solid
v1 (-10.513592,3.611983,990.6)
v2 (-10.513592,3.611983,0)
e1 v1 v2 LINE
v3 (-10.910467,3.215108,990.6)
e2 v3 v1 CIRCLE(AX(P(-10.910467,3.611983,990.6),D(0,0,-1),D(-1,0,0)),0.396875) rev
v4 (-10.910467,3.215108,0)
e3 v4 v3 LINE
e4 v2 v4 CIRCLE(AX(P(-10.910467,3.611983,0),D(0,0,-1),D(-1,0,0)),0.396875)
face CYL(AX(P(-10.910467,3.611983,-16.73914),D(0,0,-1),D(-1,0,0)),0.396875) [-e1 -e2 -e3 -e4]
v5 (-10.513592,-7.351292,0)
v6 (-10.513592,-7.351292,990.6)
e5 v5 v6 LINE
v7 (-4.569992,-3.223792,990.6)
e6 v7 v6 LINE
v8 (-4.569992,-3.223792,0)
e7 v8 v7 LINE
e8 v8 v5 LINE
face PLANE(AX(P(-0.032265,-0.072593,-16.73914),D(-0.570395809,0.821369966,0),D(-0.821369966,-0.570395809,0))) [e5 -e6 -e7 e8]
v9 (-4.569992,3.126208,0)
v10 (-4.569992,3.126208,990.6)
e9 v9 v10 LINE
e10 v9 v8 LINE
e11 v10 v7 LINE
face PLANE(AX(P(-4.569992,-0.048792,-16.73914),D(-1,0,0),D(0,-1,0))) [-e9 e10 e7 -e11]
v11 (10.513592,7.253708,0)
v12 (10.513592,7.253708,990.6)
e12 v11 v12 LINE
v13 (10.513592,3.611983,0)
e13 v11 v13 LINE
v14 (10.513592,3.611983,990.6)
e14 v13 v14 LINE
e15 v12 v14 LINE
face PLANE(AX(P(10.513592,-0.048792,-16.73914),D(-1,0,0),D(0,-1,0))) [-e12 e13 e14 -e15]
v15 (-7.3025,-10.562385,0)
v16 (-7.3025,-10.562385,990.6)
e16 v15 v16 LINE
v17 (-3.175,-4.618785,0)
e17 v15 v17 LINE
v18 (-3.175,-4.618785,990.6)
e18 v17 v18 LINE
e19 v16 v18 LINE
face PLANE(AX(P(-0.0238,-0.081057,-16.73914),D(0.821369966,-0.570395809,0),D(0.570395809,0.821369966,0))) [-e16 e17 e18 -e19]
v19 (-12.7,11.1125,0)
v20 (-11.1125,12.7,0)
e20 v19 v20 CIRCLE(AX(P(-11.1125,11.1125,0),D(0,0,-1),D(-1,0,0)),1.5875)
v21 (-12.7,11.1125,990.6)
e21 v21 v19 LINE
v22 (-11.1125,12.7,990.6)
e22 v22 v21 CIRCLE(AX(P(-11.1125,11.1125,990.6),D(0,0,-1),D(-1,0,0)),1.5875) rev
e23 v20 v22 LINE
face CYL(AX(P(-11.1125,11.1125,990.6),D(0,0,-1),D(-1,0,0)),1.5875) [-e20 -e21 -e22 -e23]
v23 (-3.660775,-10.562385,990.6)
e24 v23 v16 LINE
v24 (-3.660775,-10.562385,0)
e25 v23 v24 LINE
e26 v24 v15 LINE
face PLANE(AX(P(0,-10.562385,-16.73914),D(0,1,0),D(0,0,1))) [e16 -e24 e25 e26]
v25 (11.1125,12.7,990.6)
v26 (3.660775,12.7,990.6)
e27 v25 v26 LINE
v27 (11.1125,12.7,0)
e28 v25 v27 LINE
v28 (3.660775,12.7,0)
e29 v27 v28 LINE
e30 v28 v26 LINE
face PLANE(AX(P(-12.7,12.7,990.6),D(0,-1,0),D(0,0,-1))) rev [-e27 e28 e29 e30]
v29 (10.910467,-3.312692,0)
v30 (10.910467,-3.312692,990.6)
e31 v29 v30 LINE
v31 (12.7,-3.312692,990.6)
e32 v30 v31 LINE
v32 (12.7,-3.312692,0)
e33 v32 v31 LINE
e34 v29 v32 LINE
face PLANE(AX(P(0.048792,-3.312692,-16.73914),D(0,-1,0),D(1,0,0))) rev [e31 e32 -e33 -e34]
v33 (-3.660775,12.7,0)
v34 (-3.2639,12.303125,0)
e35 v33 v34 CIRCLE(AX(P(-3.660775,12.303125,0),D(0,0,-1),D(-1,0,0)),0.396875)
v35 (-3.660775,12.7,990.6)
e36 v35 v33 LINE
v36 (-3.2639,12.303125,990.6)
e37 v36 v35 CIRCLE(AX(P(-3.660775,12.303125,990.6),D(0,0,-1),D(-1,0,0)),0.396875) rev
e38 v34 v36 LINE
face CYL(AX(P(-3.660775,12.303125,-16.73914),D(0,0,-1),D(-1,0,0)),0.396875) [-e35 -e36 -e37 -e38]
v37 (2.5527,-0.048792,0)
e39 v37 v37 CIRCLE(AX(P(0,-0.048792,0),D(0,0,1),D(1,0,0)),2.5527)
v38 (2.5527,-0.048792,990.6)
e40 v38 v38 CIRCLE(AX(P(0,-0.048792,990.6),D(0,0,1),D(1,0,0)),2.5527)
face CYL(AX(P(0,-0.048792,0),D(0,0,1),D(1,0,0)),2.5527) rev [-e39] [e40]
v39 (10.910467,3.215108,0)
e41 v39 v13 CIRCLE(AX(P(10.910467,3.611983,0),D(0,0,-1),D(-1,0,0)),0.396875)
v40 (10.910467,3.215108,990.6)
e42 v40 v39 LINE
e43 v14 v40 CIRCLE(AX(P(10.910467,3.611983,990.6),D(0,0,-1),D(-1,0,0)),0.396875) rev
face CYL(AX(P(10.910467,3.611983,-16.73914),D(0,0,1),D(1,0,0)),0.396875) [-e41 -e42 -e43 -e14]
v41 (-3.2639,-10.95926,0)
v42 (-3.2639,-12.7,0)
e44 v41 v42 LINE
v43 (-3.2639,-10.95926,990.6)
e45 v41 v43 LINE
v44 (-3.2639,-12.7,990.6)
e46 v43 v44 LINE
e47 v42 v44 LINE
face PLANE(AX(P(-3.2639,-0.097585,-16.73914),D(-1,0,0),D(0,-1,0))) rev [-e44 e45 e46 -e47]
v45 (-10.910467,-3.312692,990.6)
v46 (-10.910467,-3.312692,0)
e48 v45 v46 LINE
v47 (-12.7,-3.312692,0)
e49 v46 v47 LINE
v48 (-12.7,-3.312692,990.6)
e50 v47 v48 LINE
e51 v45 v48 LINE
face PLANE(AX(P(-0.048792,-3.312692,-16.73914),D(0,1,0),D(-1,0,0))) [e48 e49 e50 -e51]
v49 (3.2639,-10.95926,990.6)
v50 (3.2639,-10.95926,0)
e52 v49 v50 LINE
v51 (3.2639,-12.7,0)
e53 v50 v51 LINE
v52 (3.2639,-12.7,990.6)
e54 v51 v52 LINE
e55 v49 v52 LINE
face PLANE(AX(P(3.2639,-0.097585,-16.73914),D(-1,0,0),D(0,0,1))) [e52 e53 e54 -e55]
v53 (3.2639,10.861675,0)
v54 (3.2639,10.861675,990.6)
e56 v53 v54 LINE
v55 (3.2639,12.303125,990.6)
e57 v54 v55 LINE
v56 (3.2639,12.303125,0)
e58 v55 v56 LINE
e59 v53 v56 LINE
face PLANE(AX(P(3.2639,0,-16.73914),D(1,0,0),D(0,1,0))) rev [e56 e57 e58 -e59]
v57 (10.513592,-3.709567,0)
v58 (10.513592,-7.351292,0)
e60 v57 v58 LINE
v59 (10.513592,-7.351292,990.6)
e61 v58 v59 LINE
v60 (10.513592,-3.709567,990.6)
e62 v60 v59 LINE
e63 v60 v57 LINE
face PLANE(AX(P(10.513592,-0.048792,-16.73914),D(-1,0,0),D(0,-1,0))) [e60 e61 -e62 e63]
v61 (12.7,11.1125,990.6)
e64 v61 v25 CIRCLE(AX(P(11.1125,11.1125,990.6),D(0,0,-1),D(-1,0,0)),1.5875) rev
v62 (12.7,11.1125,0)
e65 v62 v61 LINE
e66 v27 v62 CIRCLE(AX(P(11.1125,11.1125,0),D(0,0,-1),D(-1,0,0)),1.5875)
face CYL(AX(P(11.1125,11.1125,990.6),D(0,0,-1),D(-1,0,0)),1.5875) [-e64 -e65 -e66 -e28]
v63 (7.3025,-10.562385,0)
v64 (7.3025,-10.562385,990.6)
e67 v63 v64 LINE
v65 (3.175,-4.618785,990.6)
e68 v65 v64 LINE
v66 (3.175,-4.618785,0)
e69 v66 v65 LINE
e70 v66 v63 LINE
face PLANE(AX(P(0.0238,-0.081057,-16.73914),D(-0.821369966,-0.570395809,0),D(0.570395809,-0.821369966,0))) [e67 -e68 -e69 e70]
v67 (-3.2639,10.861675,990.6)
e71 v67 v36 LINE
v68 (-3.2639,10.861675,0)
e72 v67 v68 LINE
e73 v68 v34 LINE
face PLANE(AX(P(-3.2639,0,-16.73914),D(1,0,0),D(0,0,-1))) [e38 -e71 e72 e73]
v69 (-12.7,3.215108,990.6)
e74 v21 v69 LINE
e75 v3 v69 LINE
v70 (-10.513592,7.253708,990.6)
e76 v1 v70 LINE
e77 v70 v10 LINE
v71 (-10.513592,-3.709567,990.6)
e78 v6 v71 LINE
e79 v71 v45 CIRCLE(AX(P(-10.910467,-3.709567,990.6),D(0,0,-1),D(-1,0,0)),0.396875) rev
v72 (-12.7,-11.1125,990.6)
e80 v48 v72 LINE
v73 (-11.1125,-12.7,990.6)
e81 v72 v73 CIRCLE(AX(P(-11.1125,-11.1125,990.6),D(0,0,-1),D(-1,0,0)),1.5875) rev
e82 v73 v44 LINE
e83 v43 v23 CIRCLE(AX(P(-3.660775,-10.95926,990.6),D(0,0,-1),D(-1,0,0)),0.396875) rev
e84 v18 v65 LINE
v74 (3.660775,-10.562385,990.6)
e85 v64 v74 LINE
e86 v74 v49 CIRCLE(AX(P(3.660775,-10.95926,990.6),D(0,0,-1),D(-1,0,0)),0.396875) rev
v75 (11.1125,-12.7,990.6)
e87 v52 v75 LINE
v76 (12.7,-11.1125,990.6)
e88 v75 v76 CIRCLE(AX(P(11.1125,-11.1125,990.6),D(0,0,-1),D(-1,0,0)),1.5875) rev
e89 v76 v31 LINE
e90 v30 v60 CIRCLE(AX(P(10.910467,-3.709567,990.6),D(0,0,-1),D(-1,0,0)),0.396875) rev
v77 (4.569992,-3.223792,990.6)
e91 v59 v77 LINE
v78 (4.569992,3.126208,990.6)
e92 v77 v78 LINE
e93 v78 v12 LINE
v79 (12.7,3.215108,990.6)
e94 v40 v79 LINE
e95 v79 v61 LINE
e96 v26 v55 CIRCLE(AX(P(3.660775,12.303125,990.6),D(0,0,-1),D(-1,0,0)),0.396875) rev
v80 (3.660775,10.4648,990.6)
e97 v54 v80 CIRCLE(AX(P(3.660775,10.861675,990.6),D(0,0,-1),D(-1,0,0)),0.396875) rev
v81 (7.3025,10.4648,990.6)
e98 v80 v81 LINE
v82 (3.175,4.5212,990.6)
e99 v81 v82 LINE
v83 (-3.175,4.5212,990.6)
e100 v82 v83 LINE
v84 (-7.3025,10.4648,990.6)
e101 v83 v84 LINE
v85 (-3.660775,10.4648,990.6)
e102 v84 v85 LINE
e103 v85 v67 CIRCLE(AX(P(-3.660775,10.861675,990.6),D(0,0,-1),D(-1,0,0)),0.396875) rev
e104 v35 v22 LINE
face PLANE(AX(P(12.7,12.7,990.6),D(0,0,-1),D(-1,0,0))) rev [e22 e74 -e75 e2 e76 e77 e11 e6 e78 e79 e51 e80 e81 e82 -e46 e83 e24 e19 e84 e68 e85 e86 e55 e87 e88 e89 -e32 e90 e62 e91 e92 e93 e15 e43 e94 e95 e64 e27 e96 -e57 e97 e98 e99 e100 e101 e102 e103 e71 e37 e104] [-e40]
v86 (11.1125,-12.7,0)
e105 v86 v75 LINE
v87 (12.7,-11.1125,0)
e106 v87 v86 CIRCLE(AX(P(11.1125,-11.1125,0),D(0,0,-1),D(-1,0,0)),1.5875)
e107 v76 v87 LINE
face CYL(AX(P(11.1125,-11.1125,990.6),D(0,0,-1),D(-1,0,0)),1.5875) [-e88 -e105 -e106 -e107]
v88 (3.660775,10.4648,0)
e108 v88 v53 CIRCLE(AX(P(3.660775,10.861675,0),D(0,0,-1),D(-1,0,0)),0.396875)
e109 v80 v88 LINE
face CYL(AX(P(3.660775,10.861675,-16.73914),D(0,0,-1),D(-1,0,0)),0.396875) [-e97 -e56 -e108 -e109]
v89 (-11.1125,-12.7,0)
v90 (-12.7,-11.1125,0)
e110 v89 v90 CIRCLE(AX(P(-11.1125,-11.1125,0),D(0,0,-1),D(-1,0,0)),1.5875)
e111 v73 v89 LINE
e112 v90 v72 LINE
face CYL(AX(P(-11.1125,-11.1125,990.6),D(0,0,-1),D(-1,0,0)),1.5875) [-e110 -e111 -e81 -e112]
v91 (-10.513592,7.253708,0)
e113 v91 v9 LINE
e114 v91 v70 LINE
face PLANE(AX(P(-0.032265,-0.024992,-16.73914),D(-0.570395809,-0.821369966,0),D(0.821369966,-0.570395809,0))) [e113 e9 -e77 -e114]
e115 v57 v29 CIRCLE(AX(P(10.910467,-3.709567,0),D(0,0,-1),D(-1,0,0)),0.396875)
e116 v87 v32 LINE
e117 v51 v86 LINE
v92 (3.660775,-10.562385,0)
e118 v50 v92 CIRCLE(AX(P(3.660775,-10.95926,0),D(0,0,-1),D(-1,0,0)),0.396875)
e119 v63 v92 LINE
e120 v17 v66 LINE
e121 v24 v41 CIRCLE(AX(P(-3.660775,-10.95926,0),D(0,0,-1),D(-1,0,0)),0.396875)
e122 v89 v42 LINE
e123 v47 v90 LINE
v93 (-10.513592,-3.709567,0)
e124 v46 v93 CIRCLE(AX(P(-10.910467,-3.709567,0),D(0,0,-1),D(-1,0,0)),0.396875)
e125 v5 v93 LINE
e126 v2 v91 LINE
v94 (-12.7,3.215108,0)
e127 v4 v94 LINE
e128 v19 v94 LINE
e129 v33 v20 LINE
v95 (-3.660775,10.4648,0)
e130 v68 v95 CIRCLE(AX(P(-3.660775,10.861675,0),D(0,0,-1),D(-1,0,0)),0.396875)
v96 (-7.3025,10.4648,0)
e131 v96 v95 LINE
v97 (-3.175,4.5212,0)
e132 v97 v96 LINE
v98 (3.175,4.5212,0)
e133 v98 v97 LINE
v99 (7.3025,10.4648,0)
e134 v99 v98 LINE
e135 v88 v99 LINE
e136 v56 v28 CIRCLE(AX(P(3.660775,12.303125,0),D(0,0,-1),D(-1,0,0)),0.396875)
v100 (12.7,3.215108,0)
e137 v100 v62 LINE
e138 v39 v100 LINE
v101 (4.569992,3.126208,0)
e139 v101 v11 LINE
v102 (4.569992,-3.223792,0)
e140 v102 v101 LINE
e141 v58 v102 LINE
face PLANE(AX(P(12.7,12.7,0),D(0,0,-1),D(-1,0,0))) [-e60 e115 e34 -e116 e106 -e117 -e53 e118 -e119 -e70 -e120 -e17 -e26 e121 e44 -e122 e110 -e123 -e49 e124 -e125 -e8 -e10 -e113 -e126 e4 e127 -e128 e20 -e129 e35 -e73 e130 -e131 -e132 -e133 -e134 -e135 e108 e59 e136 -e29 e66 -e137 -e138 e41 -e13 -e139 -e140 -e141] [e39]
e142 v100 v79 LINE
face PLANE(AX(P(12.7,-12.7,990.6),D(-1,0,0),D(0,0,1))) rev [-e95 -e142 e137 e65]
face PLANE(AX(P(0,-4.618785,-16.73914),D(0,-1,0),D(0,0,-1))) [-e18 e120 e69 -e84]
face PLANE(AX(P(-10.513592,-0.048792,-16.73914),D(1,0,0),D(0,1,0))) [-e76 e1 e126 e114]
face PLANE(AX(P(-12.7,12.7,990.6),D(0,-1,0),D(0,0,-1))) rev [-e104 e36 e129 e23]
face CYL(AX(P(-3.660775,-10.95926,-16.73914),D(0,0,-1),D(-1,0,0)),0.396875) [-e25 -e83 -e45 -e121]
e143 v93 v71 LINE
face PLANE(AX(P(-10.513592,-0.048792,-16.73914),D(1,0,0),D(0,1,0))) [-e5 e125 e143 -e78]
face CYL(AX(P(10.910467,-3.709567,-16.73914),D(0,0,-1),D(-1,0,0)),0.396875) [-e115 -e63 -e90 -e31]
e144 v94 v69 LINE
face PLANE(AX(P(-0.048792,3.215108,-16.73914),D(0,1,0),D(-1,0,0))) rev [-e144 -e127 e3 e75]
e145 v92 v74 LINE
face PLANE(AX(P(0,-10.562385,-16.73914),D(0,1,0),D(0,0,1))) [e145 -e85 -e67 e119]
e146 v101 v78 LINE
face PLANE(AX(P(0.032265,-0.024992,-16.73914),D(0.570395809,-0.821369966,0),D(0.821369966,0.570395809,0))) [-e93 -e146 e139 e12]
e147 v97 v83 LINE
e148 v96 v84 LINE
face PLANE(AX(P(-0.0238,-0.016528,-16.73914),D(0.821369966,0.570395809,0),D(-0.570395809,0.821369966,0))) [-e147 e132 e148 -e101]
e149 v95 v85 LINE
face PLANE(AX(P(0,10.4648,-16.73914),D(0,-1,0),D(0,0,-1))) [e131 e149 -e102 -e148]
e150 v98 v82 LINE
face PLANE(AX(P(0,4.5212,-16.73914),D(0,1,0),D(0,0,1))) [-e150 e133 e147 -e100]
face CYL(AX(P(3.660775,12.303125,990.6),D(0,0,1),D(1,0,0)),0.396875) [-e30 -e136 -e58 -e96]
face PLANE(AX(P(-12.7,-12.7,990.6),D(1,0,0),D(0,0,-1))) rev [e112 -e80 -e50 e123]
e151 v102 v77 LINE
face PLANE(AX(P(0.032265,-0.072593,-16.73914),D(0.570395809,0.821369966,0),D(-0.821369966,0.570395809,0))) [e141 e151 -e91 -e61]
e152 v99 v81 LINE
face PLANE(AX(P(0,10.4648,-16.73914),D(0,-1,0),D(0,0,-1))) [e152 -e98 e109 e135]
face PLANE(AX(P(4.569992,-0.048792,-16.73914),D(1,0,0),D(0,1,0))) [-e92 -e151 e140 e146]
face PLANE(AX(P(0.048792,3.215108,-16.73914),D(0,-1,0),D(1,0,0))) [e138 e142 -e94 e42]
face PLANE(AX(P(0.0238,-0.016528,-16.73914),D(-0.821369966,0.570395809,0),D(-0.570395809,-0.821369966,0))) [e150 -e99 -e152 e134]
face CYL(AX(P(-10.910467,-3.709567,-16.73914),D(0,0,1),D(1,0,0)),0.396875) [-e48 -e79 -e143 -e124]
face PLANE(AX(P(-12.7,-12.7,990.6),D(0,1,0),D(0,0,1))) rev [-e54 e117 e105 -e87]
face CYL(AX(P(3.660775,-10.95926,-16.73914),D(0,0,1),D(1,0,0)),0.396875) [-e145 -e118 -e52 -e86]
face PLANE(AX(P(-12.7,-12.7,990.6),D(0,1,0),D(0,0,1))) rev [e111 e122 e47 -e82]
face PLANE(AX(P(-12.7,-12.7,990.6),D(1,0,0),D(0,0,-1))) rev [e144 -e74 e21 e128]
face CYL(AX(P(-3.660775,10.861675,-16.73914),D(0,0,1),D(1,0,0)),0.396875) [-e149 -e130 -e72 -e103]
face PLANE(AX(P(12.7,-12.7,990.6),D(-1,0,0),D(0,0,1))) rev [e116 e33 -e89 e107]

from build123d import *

# Parameters (mm, degrees)
SKETCH1_W           = 25.4
SKETCH1_H           = 25.4
BOSS_EXTRUDE1_DEPTH = 990.6
FILLET1_R           = 1.5875
HOLE1_OUTLINE_R     = 2.5527
HOLE1_DEPTH         = 990.6
SKETCH7_W           = 6.5278
SKETCH7_H           = 2.2352
CUT_EXTRUDE2_DEPTH  = 990.6
FILLET4_R           = 0.396875
CIRPATTERN2_DEPTH   = 990.6


# Read off the part's stored shape, not the designer's step: Hole1, CirPattern2
with BuildPart() as part:
    # Sketch1 → Boss-Extrude1 (new body)
    with BuildSketch(Plane.XY):
        Rectangle(SKETCH1_W, SKETCH1_H)
    extrude(amount=BOSS_EXTRUDE1_DEPTH)

    # Fillet1
    fillet1_edges = [part.edges().sort_by_distance(p)[0] for p in [
        (12.7, -12.7, 495.3),
        (-12.7, -12.7, 495.3),
        (-12.7, 12.7, 495.3),
        (12.7, 12.7, 495.3),
    ]]
    fillet(fillet1_edges, radius=FILLET1_R)

    # Hole1 outline → Hole1 (cut)
    with BuildSketch(Plane.XY):
        with Locations((0, -0.048792482)):
            Circle(HOLE1_OUTLINE_R)
    extrude(amount=HOLE1_DEPTH, mode=Mode.SUBTRACT)

    # Sketch7 → Cut-Extrude2 (cut)
    with BuildSketch(Plane.XY.offset(990.6)):
        with Locations((0, 11.5824)):
            Rectangle(SKETCH7_W, SKETCH7_H)
        Polygon((-3.175, 4.5212), (-7.3025, 10.4648), (7.3025, 10.4648), (3.175, 4.5212), align=None)
    extrude(amount=-CUT_EXTRUDE2_DEPTH, mode=Mode.SUBTRACT)

    # Fillet4
    fillet4_edges = [part.edges().sort_by_distance(p)[0] for p in [
        (-3.2639, 10.4648, 495.3),
        (-3.2639, 12.7, 495.3),
        (3.2639, 12.7, 495.3),
        (3.2639, 10.4648, 495.3),
    ]]
    fillet(fillet4_edges, radius=FILLET4_R)

    # CirPattern2 outline → CirPattern2 (cut)
    with BuildSketch(Plane.XY):
        with BuildLine():
            ThreePointArc((-3.660775, -10.562384964), (-3.380141996, -10.67862696), (-3.2639, -10.959259964))
            Line((-3.2639, -10.959259964), (-3.2639, -12.7))
            Line((-3.2639, -12.7), (3.2639, -12.7))
            Line((3.2639, -12.7), (3.2639, -10.959259964))
            ThreePointArc((3.2639, -10.959259964), (3.380141996, -10.67862696), (3.660775, -10.562384964))
            Line((3.660775, -10.562384964), (7.3025, -10.562384964))
            Line((7.3025, -10.562384964), (3.175, -4.618784964))
            Line((3.175, -4.618784964), (-3.175, -4.618784964))
            Line((-3.175, -4.618784964), (-7.3025, -10.562384964))
            Line((-7.3025, -10.562384964), (-3.660775, -10.562384964))
        make_face()
        with BuildLine():
            Line((-12.7, -3.312692482), (-10.910467482, -3.312692482))
            ThreePointArc((-10.910467482, -3.312692482), (-10.629834478, -3.428934478), (-10.513592482, -3.709567482))
            Line((-10.513592482, -3.709567482), (-10.513592482, -7.351292482))
            Line((-10.513592482, -7.351292482), (-4.569992482, -3.223792482))
            Line((-4.569992482, -3.223792482), (-4.569992482, 3.126207518))
            Line((-4.569992482, 3.126207518), (-10.513592482, 7.253707518))
            Line((-10.513592482, 7.253707518), (-10.513592482, 3.611982518))
            ThreePointArc((-10.513592482, 3.611982518), (-10.629834478, 3.331349514), (-10.910467482, 3.215107518))
            Line((-10.910467482, 3.215107518), (-12.7, 3.215107518))
            Line((-12.7, 3.215107518), (-12.7, -3.312692482))
        make_face()
        with BuildLine():
            ThreePointArc((10.513592482, -3.709567482), (10.629834478, -3.428934478), (10.910467482, -3.312692482))
            Line((10.910467482, -3.312692482), (12.7, -3.312692482))
            Line((12.7, -3.312692482), (12.7, 3.215107518))
            Line((12.7, 3.215107518), (10.910467482, 3.215107518))
            ThreePointArc((10.910467482, 3.215107518), (10.629834478, 3.331349514), (10.513592482, 3.611982518))
            Line((10.513592482, 3.611982518), (10.513592482, 7.253707518))
            Line((10.513592482, 7.253707518), (4.569992482, 3.126207518))
            Line((4.569992482, 3.126207518), (4.569992482, -3.223792482))
            Line((4.569992482, -3.223792482), (10.513592482, -7.351292482))
            Line((10.513592482, -7.351292482), (10.513592482, -3.709567482))
        make_face()
    extrude(amount=CIRPATTERN2_DEPTH, mode=Mode.SUBTRACT)


solid = part.part
